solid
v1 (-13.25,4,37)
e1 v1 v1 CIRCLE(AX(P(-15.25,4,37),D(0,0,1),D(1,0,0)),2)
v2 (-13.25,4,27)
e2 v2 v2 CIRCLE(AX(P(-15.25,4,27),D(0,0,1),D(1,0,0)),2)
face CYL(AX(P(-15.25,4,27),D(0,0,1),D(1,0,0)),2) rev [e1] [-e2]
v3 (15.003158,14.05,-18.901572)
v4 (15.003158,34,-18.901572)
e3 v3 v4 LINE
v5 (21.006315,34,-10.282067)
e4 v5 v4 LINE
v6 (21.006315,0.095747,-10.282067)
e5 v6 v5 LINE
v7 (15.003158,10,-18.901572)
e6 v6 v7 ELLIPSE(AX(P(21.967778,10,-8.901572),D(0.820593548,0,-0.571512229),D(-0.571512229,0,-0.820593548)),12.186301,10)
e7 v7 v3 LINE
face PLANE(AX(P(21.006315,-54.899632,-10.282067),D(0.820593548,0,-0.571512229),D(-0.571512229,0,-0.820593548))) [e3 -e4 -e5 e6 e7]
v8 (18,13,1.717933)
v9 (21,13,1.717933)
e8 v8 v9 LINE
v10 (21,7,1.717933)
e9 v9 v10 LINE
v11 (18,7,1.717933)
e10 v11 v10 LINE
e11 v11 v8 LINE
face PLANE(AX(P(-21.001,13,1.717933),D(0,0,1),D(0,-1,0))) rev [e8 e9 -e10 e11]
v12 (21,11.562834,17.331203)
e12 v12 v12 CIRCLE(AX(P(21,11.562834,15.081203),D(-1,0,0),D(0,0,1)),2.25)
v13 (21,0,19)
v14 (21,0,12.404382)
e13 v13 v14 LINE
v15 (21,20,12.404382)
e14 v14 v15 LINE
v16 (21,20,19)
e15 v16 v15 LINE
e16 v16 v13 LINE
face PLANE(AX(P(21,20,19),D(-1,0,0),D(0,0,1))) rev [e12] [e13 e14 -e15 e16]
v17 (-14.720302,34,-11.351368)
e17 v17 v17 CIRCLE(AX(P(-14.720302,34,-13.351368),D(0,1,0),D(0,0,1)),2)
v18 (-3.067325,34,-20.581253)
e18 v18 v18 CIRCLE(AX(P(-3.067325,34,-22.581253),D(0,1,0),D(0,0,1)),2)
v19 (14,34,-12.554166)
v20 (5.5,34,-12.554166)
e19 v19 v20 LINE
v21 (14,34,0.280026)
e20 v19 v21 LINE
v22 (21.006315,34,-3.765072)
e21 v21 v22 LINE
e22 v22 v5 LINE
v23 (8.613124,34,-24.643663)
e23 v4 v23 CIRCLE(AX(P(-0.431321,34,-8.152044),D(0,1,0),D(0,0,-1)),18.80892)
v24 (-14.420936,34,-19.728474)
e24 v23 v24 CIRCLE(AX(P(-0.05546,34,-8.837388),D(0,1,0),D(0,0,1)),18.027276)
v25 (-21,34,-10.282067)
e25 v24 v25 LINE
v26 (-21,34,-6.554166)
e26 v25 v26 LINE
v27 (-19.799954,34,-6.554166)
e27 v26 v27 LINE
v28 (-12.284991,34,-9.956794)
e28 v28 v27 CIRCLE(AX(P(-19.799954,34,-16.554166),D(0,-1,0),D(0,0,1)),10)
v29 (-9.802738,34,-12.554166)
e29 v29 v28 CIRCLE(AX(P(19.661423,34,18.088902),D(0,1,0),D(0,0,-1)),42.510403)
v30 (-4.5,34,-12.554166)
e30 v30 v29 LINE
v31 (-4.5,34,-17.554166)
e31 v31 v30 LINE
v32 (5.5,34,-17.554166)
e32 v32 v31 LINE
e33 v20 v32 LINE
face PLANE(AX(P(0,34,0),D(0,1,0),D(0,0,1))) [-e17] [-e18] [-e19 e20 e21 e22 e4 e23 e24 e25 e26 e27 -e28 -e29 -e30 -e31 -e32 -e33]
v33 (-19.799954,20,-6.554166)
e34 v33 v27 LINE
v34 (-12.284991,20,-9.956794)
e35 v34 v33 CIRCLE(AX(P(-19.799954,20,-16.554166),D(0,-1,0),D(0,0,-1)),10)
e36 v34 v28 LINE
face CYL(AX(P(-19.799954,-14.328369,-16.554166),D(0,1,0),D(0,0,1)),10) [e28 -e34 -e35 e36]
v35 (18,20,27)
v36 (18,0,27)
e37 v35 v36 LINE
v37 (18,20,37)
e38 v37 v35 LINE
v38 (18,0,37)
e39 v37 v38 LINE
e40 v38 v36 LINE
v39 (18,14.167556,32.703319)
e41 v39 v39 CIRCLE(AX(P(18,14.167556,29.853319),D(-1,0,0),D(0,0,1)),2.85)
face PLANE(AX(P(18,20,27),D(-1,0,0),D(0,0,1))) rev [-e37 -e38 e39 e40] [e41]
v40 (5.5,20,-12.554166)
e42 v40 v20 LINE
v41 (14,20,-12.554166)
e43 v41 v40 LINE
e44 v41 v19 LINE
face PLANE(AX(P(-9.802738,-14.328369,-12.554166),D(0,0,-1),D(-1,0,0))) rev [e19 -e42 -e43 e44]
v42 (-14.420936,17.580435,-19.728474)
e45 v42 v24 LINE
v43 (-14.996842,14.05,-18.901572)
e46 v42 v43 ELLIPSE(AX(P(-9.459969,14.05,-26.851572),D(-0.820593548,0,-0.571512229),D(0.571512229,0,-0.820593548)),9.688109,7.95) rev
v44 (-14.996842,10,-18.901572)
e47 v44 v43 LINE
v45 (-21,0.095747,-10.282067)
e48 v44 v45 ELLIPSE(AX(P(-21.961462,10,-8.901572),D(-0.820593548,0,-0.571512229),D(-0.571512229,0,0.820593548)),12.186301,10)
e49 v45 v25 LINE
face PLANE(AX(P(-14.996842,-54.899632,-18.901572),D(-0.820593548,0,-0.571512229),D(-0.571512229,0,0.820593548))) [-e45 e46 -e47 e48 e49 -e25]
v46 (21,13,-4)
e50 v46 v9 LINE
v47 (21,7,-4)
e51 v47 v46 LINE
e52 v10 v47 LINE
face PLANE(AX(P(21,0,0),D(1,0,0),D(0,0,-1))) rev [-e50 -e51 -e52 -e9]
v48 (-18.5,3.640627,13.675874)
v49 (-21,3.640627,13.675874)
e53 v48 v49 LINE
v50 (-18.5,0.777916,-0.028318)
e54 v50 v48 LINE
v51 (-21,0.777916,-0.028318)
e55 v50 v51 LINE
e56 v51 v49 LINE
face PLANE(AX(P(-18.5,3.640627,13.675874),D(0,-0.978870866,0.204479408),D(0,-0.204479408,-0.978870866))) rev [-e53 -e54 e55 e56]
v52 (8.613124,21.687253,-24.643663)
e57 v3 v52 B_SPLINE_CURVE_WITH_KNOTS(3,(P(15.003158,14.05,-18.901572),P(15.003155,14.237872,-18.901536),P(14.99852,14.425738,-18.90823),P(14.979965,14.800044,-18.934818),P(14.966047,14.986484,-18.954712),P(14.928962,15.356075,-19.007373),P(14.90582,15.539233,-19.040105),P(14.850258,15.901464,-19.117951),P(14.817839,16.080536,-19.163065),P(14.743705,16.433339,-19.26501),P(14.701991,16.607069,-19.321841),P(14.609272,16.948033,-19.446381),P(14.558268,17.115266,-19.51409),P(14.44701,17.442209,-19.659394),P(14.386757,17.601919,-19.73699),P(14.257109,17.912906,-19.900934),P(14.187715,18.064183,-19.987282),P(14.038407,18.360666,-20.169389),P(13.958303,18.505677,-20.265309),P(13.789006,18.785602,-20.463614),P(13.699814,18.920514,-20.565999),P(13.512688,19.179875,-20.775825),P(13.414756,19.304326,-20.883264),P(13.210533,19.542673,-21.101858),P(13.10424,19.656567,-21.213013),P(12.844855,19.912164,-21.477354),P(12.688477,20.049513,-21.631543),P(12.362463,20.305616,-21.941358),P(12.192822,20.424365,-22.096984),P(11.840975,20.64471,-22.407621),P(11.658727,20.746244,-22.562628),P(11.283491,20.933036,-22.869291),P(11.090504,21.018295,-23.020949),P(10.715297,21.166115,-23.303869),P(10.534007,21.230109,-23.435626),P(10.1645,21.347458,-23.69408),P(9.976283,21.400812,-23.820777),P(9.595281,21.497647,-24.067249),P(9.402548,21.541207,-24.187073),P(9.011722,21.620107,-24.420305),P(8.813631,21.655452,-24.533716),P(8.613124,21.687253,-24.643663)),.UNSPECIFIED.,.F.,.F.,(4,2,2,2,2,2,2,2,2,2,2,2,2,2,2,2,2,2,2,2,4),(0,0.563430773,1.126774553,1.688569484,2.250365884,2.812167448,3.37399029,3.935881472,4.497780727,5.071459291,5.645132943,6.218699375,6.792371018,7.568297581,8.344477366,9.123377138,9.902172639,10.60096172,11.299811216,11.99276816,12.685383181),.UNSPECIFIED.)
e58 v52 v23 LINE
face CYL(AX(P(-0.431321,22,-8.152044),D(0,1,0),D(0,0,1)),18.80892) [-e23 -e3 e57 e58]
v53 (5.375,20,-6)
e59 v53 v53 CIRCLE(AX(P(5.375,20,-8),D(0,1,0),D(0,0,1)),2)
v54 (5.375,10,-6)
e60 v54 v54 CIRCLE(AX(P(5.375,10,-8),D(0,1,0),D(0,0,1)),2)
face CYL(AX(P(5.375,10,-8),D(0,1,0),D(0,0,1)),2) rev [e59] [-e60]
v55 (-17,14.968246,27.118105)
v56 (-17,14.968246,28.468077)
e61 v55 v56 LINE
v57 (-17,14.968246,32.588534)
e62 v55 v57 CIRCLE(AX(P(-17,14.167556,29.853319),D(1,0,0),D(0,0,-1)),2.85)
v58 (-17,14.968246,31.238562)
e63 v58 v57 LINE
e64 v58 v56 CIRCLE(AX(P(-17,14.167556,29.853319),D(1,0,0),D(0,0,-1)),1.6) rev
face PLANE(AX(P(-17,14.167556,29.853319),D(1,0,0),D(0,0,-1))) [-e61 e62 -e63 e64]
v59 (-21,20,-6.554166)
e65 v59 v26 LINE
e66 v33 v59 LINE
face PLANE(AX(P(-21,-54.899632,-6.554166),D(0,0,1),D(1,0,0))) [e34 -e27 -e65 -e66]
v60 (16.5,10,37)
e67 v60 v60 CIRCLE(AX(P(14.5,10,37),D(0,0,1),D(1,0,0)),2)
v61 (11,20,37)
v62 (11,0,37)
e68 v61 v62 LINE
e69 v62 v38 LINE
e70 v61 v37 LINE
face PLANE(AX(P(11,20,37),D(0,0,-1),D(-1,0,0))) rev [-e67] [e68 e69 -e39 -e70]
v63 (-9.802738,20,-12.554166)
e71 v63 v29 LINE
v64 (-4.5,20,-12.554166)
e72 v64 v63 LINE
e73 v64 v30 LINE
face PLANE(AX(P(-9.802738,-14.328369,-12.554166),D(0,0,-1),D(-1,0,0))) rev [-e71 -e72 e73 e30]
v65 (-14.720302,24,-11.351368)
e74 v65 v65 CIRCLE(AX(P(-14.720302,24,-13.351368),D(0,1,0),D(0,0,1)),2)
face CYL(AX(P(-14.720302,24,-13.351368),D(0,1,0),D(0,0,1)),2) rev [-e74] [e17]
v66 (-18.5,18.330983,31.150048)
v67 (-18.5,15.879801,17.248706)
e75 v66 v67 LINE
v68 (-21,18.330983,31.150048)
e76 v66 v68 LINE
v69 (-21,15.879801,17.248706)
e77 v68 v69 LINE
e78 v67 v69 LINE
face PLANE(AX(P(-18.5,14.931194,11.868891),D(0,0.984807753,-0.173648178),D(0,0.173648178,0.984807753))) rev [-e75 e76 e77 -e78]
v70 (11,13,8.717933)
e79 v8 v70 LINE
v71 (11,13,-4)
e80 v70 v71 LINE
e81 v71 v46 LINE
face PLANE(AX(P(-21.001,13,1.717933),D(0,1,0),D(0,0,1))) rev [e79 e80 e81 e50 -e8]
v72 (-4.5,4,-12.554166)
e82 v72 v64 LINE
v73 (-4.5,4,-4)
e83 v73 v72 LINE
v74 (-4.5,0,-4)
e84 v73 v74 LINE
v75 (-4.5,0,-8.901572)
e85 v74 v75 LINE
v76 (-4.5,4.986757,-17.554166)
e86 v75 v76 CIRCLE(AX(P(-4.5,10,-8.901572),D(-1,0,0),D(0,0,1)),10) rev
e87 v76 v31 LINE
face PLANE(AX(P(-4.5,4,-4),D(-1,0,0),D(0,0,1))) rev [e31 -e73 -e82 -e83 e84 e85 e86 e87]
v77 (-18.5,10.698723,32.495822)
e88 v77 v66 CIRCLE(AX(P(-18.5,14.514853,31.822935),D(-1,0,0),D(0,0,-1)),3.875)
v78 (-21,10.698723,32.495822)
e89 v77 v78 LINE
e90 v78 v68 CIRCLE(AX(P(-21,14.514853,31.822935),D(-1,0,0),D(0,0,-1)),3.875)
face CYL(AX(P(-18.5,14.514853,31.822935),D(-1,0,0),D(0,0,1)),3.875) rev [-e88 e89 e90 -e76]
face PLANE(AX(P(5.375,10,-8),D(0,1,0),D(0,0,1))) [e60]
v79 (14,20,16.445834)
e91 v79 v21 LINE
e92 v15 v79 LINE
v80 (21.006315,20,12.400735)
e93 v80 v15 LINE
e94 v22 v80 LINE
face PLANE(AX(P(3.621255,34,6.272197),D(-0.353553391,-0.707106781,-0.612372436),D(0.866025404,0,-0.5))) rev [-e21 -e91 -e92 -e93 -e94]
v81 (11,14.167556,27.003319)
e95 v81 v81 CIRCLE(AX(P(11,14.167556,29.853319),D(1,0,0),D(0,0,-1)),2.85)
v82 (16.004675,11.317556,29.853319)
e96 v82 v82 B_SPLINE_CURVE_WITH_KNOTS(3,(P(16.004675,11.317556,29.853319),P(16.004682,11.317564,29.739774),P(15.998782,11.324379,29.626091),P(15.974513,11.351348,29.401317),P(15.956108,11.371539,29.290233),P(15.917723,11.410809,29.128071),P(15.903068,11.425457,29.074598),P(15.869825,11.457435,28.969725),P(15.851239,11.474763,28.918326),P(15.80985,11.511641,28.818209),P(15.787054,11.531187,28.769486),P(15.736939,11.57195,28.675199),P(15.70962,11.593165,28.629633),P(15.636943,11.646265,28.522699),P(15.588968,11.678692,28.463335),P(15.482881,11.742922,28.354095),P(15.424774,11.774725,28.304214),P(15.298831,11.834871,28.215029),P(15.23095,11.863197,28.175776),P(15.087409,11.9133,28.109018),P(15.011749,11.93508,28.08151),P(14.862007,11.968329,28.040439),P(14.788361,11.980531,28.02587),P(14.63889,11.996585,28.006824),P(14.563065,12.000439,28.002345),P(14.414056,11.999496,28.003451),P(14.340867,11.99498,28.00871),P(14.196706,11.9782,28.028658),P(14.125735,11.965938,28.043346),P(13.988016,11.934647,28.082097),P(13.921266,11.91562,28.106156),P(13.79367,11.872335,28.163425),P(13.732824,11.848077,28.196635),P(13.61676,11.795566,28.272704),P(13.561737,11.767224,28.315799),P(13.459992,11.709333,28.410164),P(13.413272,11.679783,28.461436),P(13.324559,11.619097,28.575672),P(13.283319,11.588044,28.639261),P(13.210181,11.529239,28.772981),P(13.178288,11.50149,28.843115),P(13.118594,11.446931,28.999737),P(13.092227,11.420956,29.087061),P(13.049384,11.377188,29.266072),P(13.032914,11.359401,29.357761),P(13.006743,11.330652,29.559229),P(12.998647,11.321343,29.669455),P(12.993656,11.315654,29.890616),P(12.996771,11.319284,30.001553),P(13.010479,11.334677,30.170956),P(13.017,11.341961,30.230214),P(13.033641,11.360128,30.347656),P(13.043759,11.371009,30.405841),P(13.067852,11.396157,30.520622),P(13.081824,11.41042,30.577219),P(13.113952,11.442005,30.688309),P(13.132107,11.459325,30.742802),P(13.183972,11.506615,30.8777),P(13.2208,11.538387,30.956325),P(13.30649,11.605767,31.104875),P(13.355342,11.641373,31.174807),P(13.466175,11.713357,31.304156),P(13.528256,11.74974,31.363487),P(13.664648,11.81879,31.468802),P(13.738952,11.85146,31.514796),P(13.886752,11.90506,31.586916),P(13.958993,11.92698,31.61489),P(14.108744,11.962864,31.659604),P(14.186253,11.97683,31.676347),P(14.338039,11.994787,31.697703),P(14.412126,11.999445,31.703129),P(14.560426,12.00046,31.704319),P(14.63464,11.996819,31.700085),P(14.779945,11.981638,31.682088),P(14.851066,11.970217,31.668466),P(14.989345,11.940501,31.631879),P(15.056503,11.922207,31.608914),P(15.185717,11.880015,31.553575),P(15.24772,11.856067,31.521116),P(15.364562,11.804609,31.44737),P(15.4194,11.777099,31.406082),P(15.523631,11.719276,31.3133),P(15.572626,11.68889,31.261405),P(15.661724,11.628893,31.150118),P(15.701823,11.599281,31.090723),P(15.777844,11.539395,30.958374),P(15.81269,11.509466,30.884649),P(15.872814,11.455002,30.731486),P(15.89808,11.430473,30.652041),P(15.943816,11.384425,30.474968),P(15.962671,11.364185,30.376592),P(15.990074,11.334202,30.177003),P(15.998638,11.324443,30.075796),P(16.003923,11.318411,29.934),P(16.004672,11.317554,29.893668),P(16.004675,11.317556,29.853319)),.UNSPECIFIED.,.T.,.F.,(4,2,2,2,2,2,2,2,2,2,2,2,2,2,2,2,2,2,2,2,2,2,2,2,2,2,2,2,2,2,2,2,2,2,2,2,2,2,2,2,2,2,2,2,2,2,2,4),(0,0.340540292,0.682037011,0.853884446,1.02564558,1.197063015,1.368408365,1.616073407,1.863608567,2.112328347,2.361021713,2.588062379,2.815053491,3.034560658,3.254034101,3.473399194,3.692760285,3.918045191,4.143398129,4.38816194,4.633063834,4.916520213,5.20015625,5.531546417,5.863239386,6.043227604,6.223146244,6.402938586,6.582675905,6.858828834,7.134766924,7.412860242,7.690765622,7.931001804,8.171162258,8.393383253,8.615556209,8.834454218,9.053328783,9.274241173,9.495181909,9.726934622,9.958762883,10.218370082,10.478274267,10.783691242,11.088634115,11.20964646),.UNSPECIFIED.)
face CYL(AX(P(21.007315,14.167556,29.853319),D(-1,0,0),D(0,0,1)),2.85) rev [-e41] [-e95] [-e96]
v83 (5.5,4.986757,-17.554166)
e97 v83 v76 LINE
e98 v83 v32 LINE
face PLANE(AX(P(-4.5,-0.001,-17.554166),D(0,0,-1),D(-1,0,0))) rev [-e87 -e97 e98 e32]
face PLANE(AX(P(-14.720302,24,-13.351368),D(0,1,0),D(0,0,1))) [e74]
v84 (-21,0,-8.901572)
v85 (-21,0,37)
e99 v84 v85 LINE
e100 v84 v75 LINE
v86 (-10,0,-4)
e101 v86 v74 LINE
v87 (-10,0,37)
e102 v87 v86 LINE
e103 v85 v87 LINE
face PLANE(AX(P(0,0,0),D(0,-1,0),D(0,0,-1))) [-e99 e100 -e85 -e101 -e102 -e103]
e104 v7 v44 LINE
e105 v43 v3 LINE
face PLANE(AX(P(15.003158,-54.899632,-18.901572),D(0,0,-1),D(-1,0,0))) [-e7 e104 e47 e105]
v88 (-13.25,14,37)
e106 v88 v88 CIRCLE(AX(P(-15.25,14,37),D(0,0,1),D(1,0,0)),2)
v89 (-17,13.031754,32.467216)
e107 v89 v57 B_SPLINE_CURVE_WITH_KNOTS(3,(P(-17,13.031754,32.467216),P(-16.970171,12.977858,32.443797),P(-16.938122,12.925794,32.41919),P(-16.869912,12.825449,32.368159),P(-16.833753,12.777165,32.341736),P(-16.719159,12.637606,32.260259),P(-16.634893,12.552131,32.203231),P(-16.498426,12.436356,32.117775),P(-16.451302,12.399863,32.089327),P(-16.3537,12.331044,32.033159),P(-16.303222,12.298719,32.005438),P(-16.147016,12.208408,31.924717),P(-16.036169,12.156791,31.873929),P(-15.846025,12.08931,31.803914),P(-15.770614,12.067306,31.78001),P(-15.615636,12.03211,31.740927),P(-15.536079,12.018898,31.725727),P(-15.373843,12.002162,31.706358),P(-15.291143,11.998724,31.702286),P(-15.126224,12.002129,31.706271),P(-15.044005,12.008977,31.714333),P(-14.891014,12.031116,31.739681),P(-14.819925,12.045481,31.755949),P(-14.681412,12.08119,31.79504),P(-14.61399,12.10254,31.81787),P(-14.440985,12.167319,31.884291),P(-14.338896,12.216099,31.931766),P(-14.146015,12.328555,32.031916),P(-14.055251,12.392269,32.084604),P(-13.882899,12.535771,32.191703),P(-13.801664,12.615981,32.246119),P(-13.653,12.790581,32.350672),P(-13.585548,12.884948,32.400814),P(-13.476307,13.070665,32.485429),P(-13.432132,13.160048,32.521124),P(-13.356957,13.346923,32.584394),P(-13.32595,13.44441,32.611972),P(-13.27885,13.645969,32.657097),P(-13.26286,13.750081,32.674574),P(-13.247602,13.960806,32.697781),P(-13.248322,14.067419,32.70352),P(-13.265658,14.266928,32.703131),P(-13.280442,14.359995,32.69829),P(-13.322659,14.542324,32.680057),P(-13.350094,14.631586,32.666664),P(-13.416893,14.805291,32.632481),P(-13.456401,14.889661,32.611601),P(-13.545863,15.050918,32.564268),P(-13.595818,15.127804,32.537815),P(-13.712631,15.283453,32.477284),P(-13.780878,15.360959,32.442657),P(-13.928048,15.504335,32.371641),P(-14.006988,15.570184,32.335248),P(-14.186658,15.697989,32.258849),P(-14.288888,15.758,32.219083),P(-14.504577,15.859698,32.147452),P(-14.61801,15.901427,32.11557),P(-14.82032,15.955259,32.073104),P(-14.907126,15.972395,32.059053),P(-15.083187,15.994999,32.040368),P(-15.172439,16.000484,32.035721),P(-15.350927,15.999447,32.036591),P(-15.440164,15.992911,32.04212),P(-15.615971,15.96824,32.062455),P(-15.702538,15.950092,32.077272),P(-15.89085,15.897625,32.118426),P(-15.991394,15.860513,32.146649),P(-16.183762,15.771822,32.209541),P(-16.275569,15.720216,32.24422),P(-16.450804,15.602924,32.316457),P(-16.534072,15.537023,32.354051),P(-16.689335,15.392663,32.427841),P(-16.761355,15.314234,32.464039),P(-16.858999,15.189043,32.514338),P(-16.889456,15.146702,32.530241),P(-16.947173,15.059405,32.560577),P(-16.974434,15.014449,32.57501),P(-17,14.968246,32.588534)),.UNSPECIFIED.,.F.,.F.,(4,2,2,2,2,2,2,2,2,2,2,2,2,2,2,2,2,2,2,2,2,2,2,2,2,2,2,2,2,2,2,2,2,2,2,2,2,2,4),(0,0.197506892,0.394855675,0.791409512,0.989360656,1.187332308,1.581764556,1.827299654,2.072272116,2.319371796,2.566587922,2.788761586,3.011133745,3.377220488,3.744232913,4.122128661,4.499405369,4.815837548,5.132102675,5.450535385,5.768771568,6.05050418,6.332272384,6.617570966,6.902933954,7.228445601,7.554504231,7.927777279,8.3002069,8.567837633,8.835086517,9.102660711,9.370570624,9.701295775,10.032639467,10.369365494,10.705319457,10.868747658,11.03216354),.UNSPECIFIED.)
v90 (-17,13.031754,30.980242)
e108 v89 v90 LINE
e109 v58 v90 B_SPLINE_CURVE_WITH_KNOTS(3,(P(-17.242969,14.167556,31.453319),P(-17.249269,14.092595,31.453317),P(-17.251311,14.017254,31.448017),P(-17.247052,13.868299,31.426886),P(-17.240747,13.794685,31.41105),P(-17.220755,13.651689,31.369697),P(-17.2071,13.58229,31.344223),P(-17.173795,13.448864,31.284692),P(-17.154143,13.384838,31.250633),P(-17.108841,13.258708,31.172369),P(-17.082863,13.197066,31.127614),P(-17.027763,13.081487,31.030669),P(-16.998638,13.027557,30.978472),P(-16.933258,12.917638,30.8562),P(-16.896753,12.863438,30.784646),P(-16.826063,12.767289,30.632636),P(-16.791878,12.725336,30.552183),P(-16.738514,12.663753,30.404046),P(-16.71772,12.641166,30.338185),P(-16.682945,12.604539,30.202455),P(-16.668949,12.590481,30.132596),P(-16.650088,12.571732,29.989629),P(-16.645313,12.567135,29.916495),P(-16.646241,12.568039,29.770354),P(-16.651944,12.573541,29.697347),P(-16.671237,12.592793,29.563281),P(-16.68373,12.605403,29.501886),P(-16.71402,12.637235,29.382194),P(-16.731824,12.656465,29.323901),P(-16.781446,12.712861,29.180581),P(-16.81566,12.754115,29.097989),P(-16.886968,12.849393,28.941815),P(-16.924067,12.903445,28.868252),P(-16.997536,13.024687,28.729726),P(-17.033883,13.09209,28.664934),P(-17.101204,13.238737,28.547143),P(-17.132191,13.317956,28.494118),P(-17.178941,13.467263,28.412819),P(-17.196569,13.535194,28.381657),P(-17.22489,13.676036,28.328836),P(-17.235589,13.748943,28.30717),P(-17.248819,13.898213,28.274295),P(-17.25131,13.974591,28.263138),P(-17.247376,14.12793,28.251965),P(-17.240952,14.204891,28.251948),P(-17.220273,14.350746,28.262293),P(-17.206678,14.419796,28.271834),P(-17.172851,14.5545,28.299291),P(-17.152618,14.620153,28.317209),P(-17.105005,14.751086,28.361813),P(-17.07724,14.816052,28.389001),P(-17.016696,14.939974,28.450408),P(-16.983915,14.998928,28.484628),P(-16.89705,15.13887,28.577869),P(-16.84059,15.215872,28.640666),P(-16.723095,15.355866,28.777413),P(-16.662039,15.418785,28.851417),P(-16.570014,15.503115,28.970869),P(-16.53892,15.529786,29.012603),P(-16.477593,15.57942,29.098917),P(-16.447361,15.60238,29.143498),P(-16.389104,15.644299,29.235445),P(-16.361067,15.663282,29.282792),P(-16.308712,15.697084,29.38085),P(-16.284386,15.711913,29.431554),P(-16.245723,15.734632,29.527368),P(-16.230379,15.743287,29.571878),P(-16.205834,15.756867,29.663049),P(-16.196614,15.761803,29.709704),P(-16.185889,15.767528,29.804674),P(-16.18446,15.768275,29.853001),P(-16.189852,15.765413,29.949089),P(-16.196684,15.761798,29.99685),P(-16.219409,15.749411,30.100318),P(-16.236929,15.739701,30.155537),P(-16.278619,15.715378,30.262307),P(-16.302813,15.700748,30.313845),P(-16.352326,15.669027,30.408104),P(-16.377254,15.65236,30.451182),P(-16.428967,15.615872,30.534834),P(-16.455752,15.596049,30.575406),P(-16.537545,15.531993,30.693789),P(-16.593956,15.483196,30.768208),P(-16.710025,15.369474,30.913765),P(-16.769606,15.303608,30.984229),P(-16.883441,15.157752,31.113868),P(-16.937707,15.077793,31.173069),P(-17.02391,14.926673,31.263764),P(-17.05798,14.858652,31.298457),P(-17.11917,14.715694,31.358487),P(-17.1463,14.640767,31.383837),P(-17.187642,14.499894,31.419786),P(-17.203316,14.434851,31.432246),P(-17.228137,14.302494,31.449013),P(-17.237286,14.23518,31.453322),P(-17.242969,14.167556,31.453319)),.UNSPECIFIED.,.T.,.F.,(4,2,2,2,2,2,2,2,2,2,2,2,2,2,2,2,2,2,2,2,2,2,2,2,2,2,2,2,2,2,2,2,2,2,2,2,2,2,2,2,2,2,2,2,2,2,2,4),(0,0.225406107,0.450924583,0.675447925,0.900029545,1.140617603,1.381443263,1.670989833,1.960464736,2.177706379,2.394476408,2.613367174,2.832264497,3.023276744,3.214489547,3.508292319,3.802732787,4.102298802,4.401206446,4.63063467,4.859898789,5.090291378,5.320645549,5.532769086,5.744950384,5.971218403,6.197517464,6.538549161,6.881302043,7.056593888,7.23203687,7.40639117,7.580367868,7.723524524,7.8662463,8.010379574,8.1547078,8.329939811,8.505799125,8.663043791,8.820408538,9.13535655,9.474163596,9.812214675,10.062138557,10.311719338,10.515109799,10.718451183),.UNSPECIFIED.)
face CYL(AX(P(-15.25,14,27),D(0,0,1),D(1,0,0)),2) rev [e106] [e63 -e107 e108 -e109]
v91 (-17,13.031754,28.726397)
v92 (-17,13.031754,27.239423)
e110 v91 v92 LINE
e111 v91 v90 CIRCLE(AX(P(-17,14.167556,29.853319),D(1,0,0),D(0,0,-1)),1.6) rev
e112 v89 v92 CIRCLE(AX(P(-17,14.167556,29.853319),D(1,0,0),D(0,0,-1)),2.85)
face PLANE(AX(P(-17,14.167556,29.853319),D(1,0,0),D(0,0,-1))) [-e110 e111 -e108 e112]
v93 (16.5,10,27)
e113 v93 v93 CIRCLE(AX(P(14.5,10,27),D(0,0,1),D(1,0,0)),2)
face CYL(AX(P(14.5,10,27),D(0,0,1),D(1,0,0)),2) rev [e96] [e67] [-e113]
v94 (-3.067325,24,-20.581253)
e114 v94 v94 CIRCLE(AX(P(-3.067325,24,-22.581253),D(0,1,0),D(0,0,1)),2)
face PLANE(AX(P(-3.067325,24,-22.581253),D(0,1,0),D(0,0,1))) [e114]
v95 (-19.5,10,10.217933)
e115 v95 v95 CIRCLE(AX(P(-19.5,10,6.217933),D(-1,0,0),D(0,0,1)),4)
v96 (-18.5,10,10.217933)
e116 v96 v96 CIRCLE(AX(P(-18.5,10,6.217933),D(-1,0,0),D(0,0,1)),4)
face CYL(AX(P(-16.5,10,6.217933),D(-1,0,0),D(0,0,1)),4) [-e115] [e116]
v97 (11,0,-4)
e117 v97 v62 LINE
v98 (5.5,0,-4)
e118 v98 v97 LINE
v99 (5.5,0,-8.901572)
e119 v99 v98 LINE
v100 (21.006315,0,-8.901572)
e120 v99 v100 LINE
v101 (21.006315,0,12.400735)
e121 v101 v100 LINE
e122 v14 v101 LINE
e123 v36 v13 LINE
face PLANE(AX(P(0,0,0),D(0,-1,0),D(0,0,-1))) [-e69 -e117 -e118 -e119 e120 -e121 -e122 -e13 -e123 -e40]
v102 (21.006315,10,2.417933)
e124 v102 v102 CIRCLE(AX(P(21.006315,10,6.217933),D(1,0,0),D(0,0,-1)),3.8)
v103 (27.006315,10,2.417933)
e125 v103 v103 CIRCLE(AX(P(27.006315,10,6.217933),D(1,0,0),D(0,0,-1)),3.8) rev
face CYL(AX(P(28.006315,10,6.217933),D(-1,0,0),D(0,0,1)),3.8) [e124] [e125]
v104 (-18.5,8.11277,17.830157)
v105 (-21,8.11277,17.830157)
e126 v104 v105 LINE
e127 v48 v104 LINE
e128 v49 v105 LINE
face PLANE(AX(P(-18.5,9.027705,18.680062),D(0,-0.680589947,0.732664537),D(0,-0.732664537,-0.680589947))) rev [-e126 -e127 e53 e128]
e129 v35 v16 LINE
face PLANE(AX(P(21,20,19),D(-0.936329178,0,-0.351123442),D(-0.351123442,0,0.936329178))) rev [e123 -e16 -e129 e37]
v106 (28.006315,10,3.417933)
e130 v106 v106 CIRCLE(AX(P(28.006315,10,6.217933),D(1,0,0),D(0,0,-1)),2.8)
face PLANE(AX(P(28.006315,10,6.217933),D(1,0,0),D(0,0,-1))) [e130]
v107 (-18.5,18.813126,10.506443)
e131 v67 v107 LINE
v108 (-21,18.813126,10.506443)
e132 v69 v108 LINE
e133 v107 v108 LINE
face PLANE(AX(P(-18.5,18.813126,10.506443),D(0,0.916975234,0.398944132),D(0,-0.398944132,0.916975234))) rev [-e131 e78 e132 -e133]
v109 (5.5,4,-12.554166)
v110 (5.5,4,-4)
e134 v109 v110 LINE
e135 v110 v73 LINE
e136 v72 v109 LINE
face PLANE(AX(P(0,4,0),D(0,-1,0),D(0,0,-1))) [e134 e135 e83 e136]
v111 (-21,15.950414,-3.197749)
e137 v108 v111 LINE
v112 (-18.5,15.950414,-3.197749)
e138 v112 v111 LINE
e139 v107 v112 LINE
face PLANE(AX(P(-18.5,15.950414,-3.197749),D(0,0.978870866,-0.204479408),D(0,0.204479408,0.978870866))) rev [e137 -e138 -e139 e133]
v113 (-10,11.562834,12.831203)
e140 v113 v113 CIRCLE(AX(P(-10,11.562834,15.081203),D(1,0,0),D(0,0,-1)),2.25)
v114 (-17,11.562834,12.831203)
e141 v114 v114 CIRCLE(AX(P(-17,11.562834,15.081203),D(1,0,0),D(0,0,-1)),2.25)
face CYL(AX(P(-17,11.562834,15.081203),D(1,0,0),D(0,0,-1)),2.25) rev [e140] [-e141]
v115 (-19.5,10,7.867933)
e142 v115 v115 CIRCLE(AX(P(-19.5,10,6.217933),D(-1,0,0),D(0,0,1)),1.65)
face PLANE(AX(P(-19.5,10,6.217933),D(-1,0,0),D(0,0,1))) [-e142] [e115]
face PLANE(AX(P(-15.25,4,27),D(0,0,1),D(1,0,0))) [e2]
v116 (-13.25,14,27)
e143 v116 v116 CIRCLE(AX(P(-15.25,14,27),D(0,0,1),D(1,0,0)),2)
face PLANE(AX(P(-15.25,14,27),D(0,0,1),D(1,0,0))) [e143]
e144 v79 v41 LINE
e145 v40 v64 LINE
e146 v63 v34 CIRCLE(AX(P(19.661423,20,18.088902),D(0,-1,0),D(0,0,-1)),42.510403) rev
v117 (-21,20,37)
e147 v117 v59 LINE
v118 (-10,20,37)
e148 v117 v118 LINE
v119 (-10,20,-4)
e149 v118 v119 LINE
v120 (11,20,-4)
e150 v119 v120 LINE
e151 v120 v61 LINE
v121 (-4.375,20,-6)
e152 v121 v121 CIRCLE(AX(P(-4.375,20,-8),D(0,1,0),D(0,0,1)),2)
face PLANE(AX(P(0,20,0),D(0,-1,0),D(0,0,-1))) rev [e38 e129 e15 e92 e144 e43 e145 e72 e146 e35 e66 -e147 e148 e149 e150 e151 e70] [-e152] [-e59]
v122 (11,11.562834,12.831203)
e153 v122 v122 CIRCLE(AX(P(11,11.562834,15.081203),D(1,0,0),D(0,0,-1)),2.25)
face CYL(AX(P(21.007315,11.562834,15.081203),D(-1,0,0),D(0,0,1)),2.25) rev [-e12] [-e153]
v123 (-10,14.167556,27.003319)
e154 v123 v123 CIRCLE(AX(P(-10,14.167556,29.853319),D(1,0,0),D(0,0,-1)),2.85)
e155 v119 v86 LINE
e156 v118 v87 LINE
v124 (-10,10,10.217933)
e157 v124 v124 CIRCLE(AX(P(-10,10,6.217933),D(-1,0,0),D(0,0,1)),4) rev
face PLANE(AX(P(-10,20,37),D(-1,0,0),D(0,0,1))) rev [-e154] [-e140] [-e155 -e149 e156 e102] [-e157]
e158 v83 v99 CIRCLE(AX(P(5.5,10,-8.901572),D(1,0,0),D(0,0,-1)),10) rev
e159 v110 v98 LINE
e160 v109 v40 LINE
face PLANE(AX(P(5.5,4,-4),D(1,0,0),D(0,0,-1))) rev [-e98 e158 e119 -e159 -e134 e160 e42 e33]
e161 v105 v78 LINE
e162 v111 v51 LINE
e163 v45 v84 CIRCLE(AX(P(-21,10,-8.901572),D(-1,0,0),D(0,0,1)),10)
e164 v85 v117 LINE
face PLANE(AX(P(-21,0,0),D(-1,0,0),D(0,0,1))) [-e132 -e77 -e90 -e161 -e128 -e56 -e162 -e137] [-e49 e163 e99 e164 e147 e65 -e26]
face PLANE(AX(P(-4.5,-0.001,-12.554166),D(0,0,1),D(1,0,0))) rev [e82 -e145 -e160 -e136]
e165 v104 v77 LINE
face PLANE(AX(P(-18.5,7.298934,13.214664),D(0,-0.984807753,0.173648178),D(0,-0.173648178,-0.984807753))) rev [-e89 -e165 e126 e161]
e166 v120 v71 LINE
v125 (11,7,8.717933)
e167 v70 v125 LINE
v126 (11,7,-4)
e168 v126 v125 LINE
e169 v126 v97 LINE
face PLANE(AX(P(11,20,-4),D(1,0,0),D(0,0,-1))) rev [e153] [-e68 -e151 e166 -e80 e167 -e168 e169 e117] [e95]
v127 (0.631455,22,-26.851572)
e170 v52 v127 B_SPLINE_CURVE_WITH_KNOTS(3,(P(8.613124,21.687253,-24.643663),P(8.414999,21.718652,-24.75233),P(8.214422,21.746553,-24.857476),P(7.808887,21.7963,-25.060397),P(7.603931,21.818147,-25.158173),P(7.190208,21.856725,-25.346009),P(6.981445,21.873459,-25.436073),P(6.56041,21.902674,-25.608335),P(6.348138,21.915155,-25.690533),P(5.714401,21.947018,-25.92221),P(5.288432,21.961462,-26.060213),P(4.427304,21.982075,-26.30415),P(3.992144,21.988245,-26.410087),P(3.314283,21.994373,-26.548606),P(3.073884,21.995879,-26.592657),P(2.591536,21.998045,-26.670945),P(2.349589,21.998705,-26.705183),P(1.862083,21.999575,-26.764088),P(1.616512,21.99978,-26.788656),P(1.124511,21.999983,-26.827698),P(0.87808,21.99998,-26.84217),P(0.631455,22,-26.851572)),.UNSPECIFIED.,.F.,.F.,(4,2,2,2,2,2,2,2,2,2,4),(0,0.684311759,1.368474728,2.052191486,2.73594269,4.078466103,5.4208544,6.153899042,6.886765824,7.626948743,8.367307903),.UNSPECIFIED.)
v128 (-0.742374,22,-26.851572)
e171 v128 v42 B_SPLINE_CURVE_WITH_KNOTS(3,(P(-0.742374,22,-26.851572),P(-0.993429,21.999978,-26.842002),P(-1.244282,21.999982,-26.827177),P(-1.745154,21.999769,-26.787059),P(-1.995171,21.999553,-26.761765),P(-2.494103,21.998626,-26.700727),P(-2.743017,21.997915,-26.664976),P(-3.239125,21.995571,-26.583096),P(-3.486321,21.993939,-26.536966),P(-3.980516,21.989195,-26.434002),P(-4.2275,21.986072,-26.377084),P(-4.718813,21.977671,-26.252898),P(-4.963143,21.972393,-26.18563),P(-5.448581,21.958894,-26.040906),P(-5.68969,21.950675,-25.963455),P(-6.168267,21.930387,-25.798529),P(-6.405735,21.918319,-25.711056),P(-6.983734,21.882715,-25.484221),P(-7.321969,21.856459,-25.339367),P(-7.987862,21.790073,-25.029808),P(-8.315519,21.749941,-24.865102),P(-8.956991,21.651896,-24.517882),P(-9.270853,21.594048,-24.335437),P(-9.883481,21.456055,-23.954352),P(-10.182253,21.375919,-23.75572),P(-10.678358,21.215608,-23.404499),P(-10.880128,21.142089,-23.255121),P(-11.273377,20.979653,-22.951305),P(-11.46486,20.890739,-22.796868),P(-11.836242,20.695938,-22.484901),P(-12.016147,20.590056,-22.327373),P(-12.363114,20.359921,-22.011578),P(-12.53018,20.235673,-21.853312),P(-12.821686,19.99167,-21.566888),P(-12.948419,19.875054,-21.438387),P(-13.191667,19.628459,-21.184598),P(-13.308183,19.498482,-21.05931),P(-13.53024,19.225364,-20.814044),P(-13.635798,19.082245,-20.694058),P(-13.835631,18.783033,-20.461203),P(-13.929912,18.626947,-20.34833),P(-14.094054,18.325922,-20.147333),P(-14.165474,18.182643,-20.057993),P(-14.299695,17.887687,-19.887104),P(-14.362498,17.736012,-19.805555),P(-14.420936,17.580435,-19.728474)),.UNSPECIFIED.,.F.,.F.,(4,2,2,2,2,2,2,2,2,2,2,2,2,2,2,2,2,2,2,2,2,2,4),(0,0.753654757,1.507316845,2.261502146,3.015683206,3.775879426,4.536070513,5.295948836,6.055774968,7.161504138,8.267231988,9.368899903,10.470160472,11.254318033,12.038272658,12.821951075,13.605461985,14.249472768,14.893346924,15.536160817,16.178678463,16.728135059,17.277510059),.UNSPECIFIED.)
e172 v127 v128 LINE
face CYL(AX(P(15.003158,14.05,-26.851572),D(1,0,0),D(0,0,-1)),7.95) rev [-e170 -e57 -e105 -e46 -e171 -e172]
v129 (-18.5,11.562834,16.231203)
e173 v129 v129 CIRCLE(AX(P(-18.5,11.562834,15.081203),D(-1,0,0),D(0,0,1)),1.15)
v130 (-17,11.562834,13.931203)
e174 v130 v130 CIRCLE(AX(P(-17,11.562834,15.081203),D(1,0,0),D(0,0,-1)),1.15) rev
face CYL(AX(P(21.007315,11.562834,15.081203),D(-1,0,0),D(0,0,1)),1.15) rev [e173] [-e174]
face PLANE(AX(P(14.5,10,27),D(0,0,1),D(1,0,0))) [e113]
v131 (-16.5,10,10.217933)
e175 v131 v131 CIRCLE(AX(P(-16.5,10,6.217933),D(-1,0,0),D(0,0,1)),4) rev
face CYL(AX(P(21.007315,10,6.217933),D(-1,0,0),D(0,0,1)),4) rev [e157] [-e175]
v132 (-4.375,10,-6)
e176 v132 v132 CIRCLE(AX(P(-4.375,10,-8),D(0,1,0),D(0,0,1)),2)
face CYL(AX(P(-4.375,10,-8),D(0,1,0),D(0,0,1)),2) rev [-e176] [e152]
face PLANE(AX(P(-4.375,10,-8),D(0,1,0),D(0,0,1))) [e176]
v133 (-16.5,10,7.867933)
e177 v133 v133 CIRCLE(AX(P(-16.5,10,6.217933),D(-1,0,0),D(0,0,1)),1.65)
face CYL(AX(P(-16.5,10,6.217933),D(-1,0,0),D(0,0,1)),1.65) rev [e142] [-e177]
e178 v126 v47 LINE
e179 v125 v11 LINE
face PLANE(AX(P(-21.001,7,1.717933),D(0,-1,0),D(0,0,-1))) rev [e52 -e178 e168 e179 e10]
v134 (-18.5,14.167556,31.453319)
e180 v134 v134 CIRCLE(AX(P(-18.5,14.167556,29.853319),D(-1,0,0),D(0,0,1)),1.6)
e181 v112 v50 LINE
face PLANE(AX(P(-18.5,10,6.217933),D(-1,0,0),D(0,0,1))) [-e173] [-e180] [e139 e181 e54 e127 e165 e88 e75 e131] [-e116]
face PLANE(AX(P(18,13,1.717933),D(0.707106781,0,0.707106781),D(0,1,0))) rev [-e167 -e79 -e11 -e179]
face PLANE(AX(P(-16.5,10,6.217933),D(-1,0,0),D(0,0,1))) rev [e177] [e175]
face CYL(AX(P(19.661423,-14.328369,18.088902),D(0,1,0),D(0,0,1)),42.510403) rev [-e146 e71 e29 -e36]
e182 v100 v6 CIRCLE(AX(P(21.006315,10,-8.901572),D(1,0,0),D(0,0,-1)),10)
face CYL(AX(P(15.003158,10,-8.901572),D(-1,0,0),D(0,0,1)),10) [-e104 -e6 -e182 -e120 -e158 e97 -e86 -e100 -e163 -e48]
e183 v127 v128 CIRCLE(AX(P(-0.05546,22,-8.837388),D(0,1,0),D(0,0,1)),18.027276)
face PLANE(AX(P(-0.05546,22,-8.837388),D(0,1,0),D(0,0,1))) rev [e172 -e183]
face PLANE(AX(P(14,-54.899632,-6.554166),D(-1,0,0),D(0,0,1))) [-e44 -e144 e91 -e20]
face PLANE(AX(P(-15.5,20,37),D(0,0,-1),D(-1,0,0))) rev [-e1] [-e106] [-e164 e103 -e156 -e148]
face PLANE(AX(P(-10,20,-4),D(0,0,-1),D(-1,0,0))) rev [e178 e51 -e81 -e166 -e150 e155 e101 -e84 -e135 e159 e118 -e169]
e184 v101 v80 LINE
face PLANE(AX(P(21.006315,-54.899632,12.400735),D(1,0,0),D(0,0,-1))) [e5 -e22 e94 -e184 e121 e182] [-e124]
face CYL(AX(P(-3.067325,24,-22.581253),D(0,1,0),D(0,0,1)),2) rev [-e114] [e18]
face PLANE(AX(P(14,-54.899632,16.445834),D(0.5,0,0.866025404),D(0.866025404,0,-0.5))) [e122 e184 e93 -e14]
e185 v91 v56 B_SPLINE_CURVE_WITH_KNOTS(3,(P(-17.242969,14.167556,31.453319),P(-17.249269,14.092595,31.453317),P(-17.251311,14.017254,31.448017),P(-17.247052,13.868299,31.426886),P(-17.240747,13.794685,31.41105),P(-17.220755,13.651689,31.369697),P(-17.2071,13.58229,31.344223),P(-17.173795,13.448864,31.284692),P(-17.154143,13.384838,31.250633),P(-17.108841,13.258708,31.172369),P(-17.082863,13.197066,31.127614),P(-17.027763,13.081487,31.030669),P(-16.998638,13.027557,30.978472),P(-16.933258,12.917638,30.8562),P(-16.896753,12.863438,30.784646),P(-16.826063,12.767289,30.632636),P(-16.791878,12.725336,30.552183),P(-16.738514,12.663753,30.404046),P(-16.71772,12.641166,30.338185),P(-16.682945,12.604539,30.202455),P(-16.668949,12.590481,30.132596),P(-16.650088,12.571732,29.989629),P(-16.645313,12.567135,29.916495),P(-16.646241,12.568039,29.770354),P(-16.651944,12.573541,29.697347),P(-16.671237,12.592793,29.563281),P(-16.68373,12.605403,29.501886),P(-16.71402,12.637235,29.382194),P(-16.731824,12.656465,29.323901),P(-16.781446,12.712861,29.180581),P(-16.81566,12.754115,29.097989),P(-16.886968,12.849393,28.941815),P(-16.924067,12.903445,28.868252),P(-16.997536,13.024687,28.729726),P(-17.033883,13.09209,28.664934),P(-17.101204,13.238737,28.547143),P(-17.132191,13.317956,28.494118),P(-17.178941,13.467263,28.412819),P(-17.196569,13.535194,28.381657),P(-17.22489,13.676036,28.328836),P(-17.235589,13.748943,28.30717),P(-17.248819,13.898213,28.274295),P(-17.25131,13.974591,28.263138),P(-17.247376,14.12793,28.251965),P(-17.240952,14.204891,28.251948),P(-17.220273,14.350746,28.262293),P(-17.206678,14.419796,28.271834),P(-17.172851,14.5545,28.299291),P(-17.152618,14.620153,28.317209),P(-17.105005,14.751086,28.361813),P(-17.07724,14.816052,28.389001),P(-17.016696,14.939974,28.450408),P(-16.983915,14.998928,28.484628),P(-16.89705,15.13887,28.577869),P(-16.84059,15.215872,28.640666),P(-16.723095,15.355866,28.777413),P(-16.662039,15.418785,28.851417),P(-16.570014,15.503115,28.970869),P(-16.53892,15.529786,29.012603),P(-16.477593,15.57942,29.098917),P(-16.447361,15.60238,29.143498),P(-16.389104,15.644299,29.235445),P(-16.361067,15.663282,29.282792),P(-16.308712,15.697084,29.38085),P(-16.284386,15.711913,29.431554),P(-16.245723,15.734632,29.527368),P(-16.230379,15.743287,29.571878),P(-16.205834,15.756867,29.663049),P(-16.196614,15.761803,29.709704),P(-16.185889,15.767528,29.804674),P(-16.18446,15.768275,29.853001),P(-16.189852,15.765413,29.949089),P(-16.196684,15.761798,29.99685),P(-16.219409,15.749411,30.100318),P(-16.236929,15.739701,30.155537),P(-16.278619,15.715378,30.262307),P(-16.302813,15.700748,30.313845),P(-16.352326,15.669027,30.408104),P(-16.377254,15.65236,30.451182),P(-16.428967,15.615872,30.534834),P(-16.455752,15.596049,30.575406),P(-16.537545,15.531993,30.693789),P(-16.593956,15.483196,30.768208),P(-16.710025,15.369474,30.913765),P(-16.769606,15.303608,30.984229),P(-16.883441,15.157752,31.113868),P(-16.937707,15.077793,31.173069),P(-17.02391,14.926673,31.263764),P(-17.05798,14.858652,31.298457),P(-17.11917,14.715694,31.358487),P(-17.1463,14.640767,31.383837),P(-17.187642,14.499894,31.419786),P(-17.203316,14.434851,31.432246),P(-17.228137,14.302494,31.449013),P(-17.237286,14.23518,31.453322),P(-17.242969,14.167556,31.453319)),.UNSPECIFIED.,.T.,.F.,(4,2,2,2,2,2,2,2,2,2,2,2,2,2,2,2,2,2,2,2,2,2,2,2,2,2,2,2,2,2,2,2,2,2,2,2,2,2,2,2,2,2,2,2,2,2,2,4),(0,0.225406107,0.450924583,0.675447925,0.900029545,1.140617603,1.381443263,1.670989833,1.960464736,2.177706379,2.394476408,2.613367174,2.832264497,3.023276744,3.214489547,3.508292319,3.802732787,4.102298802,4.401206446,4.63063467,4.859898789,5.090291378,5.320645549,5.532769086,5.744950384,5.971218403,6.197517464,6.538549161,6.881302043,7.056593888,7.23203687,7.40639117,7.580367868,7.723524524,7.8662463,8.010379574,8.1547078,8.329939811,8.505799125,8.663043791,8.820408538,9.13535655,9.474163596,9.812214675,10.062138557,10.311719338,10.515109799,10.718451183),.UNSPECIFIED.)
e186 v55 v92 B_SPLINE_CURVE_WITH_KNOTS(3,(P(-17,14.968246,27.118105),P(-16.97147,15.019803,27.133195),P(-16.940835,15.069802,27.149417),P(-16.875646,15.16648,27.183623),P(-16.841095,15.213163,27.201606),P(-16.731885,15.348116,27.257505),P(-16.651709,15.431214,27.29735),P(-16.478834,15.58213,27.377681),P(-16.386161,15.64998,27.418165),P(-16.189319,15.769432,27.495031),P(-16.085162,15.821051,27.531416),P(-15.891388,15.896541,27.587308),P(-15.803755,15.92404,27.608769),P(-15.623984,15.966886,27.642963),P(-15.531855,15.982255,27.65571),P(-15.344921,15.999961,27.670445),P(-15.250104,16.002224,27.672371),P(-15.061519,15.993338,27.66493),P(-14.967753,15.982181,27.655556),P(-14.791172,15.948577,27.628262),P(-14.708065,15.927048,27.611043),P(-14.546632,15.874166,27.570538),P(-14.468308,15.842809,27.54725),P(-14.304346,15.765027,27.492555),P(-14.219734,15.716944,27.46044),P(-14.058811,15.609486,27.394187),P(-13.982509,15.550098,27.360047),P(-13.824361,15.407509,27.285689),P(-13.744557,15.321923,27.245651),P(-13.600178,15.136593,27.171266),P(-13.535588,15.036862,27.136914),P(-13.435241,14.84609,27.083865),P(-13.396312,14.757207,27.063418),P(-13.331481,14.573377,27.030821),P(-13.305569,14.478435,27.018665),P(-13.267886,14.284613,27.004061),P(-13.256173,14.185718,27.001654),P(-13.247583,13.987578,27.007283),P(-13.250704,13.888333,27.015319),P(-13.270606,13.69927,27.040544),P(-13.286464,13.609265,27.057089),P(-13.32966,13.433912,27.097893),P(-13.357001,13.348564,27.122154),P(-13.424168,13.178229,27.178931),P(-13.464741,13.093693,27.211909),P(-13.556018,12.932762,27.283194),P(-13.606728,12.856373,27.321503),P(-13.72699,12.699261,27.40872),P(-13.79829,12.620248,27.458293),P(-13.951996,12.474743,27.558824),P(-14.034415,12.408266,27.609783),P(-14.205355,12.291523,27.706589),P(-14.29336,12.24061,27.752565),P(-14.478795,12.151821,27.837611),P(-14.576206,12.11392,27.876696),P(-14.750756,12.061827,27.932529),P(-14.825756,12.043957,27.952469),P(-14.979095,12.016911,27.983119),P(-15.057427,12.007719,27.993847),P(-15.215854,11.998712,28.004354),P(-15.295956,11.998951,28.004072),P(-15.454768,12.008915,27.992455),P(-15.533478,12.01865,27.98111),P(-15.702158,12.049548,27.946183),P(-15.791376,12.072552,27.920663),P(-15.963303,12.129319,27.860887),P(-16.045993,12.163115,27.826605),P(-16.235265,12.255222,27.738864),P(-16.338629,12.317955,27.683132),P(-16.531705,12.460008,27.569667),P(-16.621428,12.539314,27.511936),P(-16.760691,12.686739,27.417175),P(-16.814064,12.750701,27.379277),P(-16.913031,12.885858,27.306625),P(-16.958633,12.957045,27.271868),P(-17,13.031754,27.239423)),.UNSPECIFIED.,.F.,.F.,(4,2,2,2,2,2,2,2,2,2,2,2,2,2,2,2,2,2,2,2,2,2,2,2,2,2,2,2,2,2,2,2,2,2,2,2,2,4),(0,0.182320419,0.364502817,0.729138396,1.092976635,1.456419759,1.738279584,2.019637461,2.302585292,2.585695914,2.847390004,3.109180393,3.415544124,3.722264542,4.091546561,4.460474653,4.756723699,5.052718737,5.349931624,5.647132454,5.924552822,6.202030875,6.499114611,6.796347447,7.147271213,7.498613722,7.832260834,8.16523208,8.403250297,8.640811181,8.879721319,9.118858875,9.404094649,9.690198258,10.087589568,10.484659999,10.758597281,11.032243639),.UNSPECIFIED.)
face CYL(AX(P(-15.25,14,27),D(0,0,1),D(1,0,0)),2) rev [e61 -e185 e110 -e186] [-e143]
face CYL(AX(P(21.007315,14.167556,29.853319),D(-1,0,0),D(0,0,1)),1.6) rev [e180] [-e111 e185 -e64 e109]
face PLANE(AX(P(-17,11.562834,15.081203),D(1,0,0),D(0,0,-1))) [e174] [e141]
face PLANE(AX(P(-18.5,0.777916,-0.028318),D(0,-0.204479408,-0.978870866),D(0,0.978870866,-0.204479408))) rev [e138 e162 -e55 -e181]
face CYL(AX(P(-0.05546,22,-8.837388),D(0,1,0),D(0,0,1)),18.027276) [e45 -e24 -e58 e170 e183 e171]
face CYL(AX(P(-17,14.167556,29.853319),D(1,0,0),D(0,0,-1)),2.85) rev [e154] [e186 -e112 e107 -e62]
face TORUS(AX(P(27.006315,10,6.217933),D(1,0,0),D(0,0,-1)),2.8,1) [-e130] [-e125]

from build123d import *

# Parameters (mm, degrees)
BOSS_EXTRUDE1_DEPTH             = 20
SKETCH6_W                       = 25
SKETCH6_H                       = 20
BOSS_EXTRUDE5_DEPTH             = 5.5
BOSS_EXTRUDE11_START            = -20
BOSS_EXTRUDE11_DEPTH            = 34
SKETCH4_R                       = 2
CUT_EXTRUDE1_DEPTH              = 10
BOSS_EXTRUDE13_DEPTH            = 12
FILLET11_START                  = 14.0499999
FILLET11_DEPTH                  = 7.9500001
FILLET11_START_2                = -14.996842371
FILLET11_2_DEPTH                = 30.996842371
SKETCH22_R                      = 2
CUT_EXTRUDE6_DEPTH              = 10
CHAMFER1_SIZE                   = 14
SKETCH26_W                      = 22
SKETCH26_H                      = 20
BOSS_EXTRUDE14_DEPTH            = 11
CUT_EXTRUDE7_DEPTH              = 2.5
CUT_EXTRUDE8_REACH              = 65.92
SKETCH27_R                      = 4
SKETCH27_R_2                    = 1.15
SKETCH27_R_3                    = 1.6
CUT_EXTRUDE9_DEPTH              = 2.5
BOSS_EXTRUDE15_DEPTH            = 1
BOSS_EXTRUDE15_DEPTH_BACK       = 2
SKETCH31_R                      = 4
SKETCH31_R_2                    = 1.65
SKETCH32_R                      = 2.85
SKETCH32_R_2                    = 2.25
CUT_EXTRUDE12_DEPTH             = 7
CUT_EXTRUDE12_DIRECTION_2_REACH = 61.046
SKETCH33_R                      = 3.8
BOSS_EXTRUDE17_DEPTH            = 7
FILLET17_R                      = 1
CUT_EXTRUDE13_DEPTH             = 14
SKETCH36_R                      = 2
CUT_EXTRUDE14_DEPTH             = 10
FILLET18_R                      = 10
CUT_EXTRUDE16_REACH             = 67.49
SKETCH37_W                      = 5.717933373
SKETCH37_H                      = 6
CHAMFER2_SIZE                   = 7
SKETCH38_W                      = 10
SKETCH38_H                      = 20
CUT_EXTRUDE17_DEPTH             = 4
CUT_EXTRUDE19_REACH             = 59.527
SKETCH39_W                      = 10
SKETCH39_H                      = 5


with BuildPart() as part:
    # Sketch1 → Boss-Extrude1 (new body)
    with BuildSketch(Plane(origin=(0, 0, 0), x_dir=(1, 0, 0), z_dir=(0, 1, 0))):
        Polygon((-15.5, -37), (-10, -37), (-10, 4), (11, 4), (11, -37), (18, -37), (18, -27), (21, -19), (21, 10), (-15.5, 10), align=None)
    extrude(amount=BOSS_EXTRUDE1_DEPTH)

    # Sketch6 → Boss-Extrude5 (add)
    with BuildSketch(Plane.ZY.offset(15.5)):
        with Locations((2.5, 10)):
            Rectangle(SKETCH6_W, SKETCH6_H)
    extrude(amount=BOSS_EXTRUDE5_DEPTH)

    # Sketch20 → Boss-Extrude11 (add)
    with BuildSketch(Plane(origin=(0, 20, 0), x_dir=(1, 0, 0), z_dir=(0, 1, 0)).offset(BOSS_EXTRUDE11_START)):
        Polygon((-21, 6.554166441), (14, 6.554166441), (14, -16.445833559), (21.006315459, -12.400735443), (21.006315459, 10.282066627), (15.003157729, 18.901571597), (-14.996842271, 18.901571597), (-21, 10.282066627), align=None)
    extrude(amount=BOSS_EXTRUDE11_DEPTH)

    # Sketch4 → Cut-Extrude1 (cut)
    with BuildSketch(Plane(origin=(0, 20, 0), x_dir=(1, 0, 0), z_dir=(0, 1, 0))):
        with Locations(Location((-4.375, 8, 0), (0, 0, 270))):
            Circle(SKETCH4_R)
        with Locations(Location((5.375, 8, 0), (0, 0, 270))):
            Circle(SKETCH4_R)
    extrude(amount=-CUT_EXTRUDE1_DEPTH, mode=Mode.SUBTRACT)

    # Sketch24 → Boss-Extrude13 (add)
    with BuildSketch(Plane(origin=(0, 34, 0), x_dir=(1, 0, 0), z_dir=(0, 1, 0))):
        with BuildLine():
            Line((-14.996842271, 18.901571597), (-14.420936492, 19.728473528))
            ThreePointArc((-14.420936492, 19.728473528), (-3.81756267, 26.467738085), (8.613124034, 24.643662635))
            ThreePointArc((8.613124034, 24.643662635), (12.140366622, 22.142331504), (15.003157729, 18.901571597))
            Line((15.003157729, 18.901571597), (21.006315459, 10.282066627))
            Line((21.006315459, 10.282066627), (21.006315459, 6.554166441))
            Line((21.006315459, 6.554166441), (-21, 6.554166441))
            Line((-21, 6.554166441), (-21, 10.282066627))
            Line((-21, 10.282066627), (-14.996842271, 18.901571597))
        make_face()
    extrude(amount=-BOSS_EXTRUDE13_DEPTH)

    # Fillet11: read off the stored shape, not the designer's step
    # Fillet11 outline → Fillet11 (add)
    with BuildSketch(Plane(origin=(0, 0, 0), x_dir=(1, 0, 0), z_dir=(0, 1, 0)).offset(FILLET11_START)):
        with BuildLine():
            Line((-14.996842271, 18.901571597), (15.003161757, 18.901565813))
            ThreePointArc((15.003161757, 18.901565813), (12.140369243, 22.142329149), (8.613124034, 24.643662635))
            ThreePointArc((8.613124034, 24.643662635), (-3.81756267, 26.467738085), (-14.420936492, 19.728473528))
            Line((-14.420936492, 19.728473528), (-14.996842271, 18.901571597))
        make_face()
    extrude(amount=FILLET11_DEPTH)

    # Fillet11 2 outline → Fillet11 2 (cut)
    with BuildSketch(Plane.YZ.offset(FILLET11_START_2)):
        with BuildLine():
            Line((22, -28), (22, -26.851571597))
            ThreePointArc((22, -26.851571597), (19.67149891, -21.230072687), (14.05, -18.901571597))
            Line((14.05, -18.901571597), (14.0499999, -28))
            Line((14.0499999, -28), (22, -28))
        make_face()
    extrude(amount=FILLET11_2_DEPTH, mode=Mode.SUBTRACT)

    # Sketch22 → Cut-Extrude6 (cut)
    with BuildSketch(Plane(origin=(0, 34, 0), x_dir=(1, 0, 0), z_dir=(0, 1, 0))):
        with Locations(Location((-14.720302421, 13.351367671, 0), (0, 0, 270))):
            Circle(SKETCH22_R)
        with Locations(Location((-3.067324575, 22.581252689, 0), (0, 0, 270))):
            Circle(SKETCH22_R)
    extrude(amount=-CUT_EXTRUDE6_DEPTH, mode=Mode.SUBTRACT)

    # Chamfer1
    chamfer1_edges = [part.edges().sort_by_distance(p)[0] for p in [
        (17.503157729, 34, 14.423284501),
    ]]
    chamfer(chamfer1_edges, length=CHAMFER1_SIZE)

    # Sketch26 → Boss-Extrude14 (add)
    with BuildSketch(Plane.ZY.offset(21)):
        with Locations((26, 10)):
            Rectangle(SKETCH26_W, SKETCH26_H)
    extrude(amount=-BOSS_EXTRUDE14_DEPTH)

    # Sketch25 → Cut-Extrude7 (cut)
    with BuildSketch(Plane.ZY.offset(21)):
        with BuildLine():
            Line((11.868890963, 14.931194411), (31.150048263, 18.330982662))
            ThreePointArc((31.150048263, 18.330982662), (35.639064994, 15.187739308), (32.49582164, 10.698722576))
            Line((32.49582164, 10.698722576), (13.21466434, 7.298934325))
            ThreePointArc((13.21466434, 7.298934325), (-1.168124774, 8.697638667), (11.868890963, 14.931194411))
        make_face()
    extrude(amount=-CUT_EXTRUDE7_DEPTH, mode=Mode.SUBTRACT)

    # Sketch27 → Cut-Extrude8 (cut, up to next)
    with BuildSketch(Plane.ZY.offset(18.5), mode=Mode.PRIVATE) as cut_extrude8_sk1:
        with Locations((6.217933373, 10)):
            Circle(SKETCH27_R)
    cut_extrude8_tool1 = extrude(cut_extrude8_sk1.sketch, amount=-CUT_EXTRUDE8_REACH, mode=Mode.PRIVATE) & part.part
    # Sketch27 → Cut-Extrude8 (cut, up to next)
    with BuildSketch(Plane.ZY.offset(18.5), mode=Mode.PRIVATE) as cut_extrude8_sk2:
        with Locations((15.08120315, 11.562833599)):
            Circle(SKETCH27_R_2)
    cut_extrude8_tool2 = extrude(cut_extrude8_sk2.sketch, amount=-CUT_EXTRUDE8_REACH, mode=Mode.PRIVATE) & part.part
    # Sketch27 → Cut-Extrude8 (cut, up to next)
    with BuildSketch(Plane.ZY.offset(18.5), mode=Mode.PRIVATE) as cut_extrude8_sk3:
        with Locations((29.853319446, 14.167556264)):
            Circle(SKETCH27_R_3)
    cut_extrude8_tool3 = extrude(cut_extrude8_sk3.sketch, amount=-CUT_EXTRUDE8_REACH, mode=Mode.PRIVATE) & part.part
    add(cut_extrude8_tool1.solids().sort_by_distance((-18.5, 10, 6.217933))[0], mode=Mode.SUBTRACT)
    add(cut_extrude8_tool2.solids().sort_by_distance((-18.5, 11.562834, 15.081203))[0], mode=Mode.SUBTRACT)
    add(cut_extrude8_tool3.solids().sort_by_distance((-18.5, 14.167556, 29.853319))[0], mode=Mode.SUBTRACT)

    # Sketch28 → Cut-Extrude9 (cut)
    with BuildSketch(Plane.ZY.offset(21)):
        Polygon((-0.028318142, 0.777915528), (-3.197748963, 15.950413947), (10.506443157, 18.813125656), (17.248705835, 15.879800924), (18.680061689, 9.027704864), (13.675873978, 3.640627238), align=None)
    extrude(amount=-CUT_EXTRUDE9_DEPTH, mode=Mode.SUBTRACT)

    # Sketch31 → Boss-Extrude15 (add, two sides: drawn at the far end of the back side and taken through both)
    with BuildSketch(Plane.ZY.offset(18.5).offset(-BOSS_EXTRUDE15_DEPTH_BACK)):
        with Locations((6.217933373, 10)):
            Circle(SKETCH31_R)
        with Locations((6.217933373, 10)):
            Circle(SKETCH31_R_2, mode=Mode.SUBTRACT)
    extrude(amount=BOSS_EXTRUDE15_DEPTH + BOSS_EXTRUDE15_DEPTH_BACK)

    # Sketch32 → Cut-Extrude12 (cut)
    with BuildSketch(Plane(origin=(-10, 0, 0), x_dir=(0, 0, -1), z_dir=(1, 0, 0))):
        with Locations((-29.853319446, 14.167556264)):
            Circle(SKETCH32_R)
        with Locations((-15.08120315, 11.562833599)):
            Circle(SKETCH32_R_2)
    extrude(amount=-CUT_EXTRUDE12_DEPTH, mode=Mode.SUBTRACT)

    # Sketch32 → Cut-Extrude12 direction 2 (cut, up to next)
    with BuildSketch(Plane(origin=(-10, 0, 0), x_dir=(0, 0, -1), z_dir=(1, 0, 0)), mode=Mode.PRIVATE) as cut_extrude12_direction_2_sk1:
        with Locations((-29.853319446, 14.167556264)):
            Circle(SKETCH32_R)
    cut_extrude12_direction_2_tool1 = extrude(cut_extrude12_direction_2_sk1.sketch, amount=CUT_EXTRUDE12_DIRECTION_2_REACH, mode=Mode.PRIVATE) & part.part
    # Sketch32 → Cut-Extrude12 direction 2 (cut, up to next)
    with BuildSketch(Plane(origin=(-10, 0, 0), x_dir=(0, 0, -1), z_dir=(1, 0, 0)), mode=Mode.PRIVATE) as cut_extrude12_direction_2_sk2:
        with Locations((-15.08120315, 11.562833599)):
            Circle(SKETCH32_R_2)
    cut_extrude12_direction_2_tool2 = extrude(cut_extrude12_direction_2_sk2.sketch, amount=CUT_EXTRUDE12_DIRECTION_2_REACH, mode=Mode.PRIVATE) & part.part
    add(cut_extrude12_direction_2_tool1.solids().sort_by_distance((-10, 14.167556, 29.853319))[0], mode=Mode.SUBTRACT)
    add(cut_extrude12_direction_2_tool2.solids().sort_by_distance((-10, 11.562834, 15.081203))[0], mode=Mode.SUBTRACT)

    # Sketch33 → Boss-Extrude17 (add)
    with BuildSketch(Plane(origin=(21.006315459, 0, 0), x_dir=(0, 0, -1), z_dir=(1, 0, 0))):
        with Locations((-6.217933373, 10)):
            Circle(SKETCH33_R)
    extrude(amount=BOSS_EXTRUDE17_DEPTH)

    # Fillet17
    fillet17_edges = [part.edges().sort_by_distance(p)[0] for p in [
        (28.006315459, 10, 10.017933373),
    ]]
    fillet(fillet17_edges, radius=FILLET17_R)

    # Sketch35 → Cut-Extrude13 (cut)
    with BuildSketch(Plane(origin=(0, 34, 0), x_dir=(1, 0, 0), z_dir=(0, 1, 0))):
        with BuildLine():
            Line((-19.79995418, 6.554166441), (14, 6.554166441))
            Line((14, 6.554166441), (14, 12.554166441))
            Line((14, 12.554166441), (-9.802737675, 12.554166441))
            ThreePointArc((-9.802737675, 12.554166441), (-11.071315957, 11.28171537), (-12.284990593, 9.956794065))
            ThreePointArc((-12.284990593, 9.956794065), (-15.675255632, 7.444453939), (-19.79995418, 6.554166441))
        make_face()
    extrude(amount=-CUT_EXTRUDE13_DEPTH, mode=Mode.SUBTRACT)

    # Sketch36 → Cut-Extrude14 (cut)
    with BuildSketch(Plane.XY.offset(37)):
        with Locations((-15.25, 14)):
            Circle(SKETCH36_R)
        with Locations((14.5, 10)):
            Circle(SKETCH36_R)
        with Locations((-15.25, 4)):
            Circle(SKETCH36_R)
    extrude(amount=-CUT_EXTRUDE14_DEPTH, mode=Mode.SUBTRACT)

    # Fillet18
    fillet18_edges = [part.edges().sort_by_distance(p)[0] for p in [
        (0.003157729, 0, -18.901571597),
    ]]
    fillet(fillet18_edges, radius=FILLET18_R)

    # Sketch37 → Cut-Extrude16 (cut, up to next)
    with BuildSketch(Plane(origin=(21, 0, 0), x_dir=(0, 0, -1), z_dir=(1, 0, 0)), mode=Mode.PRIVATE) as cut_extrude16_sk1:
        with Locations((1.141033313, 10)):
            Rectangle(SKETCH37_W, SKETCH37_H)
    cut_extrude16_tool1 = extrude(cut_extrude16_sk1.sketch, amount=-CUT_EXTRUDE16_REACH, mode=Mode.PRIVATE) & part.part
    add(cut_extrude16_tool1.solids().sort_by_distance((21, 10, -1.141033))[0], mode=Mode.SUBTRACT)

    # Chamfer2
    chamfer2_edges = [part.edges().sort_by_distance(p)[0] for p in [
        (11, 10, 1.717933373),
    ]]
    chamfer(chamfer2_edges, length=CHAMFER2_SIZE)

    # Sketch38 → Cut-Extrude17 (cut)
    with BuildSketch(Plane.XZ):
        with Locations((0.5, -14)):
            Rectangle(SKETCH38_W, SKETCH38_H)
    extrude(amount=-CUT_EXTRUDE17_DEPTH, mode=Mode.SUBTRACT)

    # Sketch39 → Cut-Extrude19 (cut, up to next)
    with BuildSketch(Plane(origin=(0, 34, 0), x_dir=(1, 0, 0), z_dir=(0, 1, 0)), mode=Mode.PRIVATE) as cut_extrude19_sk1:
        with Locations((0.5, 15.054166441)):
            Rectangle(SKETCH39_W, SKETCH39_H)
    cut_extrude19_tool1 = extrude(cut_extrude19_sk1.sketch, amount=-CUT_EXTRUDE19_REACH, mode=Mode.PRIVATE) & part.part
    add(cut_extrude19_tool1.solids().sort_by_distance((0.5, 34, -15.054166))[0], mode=Mode.SUBTRACT)


solid = part.part
